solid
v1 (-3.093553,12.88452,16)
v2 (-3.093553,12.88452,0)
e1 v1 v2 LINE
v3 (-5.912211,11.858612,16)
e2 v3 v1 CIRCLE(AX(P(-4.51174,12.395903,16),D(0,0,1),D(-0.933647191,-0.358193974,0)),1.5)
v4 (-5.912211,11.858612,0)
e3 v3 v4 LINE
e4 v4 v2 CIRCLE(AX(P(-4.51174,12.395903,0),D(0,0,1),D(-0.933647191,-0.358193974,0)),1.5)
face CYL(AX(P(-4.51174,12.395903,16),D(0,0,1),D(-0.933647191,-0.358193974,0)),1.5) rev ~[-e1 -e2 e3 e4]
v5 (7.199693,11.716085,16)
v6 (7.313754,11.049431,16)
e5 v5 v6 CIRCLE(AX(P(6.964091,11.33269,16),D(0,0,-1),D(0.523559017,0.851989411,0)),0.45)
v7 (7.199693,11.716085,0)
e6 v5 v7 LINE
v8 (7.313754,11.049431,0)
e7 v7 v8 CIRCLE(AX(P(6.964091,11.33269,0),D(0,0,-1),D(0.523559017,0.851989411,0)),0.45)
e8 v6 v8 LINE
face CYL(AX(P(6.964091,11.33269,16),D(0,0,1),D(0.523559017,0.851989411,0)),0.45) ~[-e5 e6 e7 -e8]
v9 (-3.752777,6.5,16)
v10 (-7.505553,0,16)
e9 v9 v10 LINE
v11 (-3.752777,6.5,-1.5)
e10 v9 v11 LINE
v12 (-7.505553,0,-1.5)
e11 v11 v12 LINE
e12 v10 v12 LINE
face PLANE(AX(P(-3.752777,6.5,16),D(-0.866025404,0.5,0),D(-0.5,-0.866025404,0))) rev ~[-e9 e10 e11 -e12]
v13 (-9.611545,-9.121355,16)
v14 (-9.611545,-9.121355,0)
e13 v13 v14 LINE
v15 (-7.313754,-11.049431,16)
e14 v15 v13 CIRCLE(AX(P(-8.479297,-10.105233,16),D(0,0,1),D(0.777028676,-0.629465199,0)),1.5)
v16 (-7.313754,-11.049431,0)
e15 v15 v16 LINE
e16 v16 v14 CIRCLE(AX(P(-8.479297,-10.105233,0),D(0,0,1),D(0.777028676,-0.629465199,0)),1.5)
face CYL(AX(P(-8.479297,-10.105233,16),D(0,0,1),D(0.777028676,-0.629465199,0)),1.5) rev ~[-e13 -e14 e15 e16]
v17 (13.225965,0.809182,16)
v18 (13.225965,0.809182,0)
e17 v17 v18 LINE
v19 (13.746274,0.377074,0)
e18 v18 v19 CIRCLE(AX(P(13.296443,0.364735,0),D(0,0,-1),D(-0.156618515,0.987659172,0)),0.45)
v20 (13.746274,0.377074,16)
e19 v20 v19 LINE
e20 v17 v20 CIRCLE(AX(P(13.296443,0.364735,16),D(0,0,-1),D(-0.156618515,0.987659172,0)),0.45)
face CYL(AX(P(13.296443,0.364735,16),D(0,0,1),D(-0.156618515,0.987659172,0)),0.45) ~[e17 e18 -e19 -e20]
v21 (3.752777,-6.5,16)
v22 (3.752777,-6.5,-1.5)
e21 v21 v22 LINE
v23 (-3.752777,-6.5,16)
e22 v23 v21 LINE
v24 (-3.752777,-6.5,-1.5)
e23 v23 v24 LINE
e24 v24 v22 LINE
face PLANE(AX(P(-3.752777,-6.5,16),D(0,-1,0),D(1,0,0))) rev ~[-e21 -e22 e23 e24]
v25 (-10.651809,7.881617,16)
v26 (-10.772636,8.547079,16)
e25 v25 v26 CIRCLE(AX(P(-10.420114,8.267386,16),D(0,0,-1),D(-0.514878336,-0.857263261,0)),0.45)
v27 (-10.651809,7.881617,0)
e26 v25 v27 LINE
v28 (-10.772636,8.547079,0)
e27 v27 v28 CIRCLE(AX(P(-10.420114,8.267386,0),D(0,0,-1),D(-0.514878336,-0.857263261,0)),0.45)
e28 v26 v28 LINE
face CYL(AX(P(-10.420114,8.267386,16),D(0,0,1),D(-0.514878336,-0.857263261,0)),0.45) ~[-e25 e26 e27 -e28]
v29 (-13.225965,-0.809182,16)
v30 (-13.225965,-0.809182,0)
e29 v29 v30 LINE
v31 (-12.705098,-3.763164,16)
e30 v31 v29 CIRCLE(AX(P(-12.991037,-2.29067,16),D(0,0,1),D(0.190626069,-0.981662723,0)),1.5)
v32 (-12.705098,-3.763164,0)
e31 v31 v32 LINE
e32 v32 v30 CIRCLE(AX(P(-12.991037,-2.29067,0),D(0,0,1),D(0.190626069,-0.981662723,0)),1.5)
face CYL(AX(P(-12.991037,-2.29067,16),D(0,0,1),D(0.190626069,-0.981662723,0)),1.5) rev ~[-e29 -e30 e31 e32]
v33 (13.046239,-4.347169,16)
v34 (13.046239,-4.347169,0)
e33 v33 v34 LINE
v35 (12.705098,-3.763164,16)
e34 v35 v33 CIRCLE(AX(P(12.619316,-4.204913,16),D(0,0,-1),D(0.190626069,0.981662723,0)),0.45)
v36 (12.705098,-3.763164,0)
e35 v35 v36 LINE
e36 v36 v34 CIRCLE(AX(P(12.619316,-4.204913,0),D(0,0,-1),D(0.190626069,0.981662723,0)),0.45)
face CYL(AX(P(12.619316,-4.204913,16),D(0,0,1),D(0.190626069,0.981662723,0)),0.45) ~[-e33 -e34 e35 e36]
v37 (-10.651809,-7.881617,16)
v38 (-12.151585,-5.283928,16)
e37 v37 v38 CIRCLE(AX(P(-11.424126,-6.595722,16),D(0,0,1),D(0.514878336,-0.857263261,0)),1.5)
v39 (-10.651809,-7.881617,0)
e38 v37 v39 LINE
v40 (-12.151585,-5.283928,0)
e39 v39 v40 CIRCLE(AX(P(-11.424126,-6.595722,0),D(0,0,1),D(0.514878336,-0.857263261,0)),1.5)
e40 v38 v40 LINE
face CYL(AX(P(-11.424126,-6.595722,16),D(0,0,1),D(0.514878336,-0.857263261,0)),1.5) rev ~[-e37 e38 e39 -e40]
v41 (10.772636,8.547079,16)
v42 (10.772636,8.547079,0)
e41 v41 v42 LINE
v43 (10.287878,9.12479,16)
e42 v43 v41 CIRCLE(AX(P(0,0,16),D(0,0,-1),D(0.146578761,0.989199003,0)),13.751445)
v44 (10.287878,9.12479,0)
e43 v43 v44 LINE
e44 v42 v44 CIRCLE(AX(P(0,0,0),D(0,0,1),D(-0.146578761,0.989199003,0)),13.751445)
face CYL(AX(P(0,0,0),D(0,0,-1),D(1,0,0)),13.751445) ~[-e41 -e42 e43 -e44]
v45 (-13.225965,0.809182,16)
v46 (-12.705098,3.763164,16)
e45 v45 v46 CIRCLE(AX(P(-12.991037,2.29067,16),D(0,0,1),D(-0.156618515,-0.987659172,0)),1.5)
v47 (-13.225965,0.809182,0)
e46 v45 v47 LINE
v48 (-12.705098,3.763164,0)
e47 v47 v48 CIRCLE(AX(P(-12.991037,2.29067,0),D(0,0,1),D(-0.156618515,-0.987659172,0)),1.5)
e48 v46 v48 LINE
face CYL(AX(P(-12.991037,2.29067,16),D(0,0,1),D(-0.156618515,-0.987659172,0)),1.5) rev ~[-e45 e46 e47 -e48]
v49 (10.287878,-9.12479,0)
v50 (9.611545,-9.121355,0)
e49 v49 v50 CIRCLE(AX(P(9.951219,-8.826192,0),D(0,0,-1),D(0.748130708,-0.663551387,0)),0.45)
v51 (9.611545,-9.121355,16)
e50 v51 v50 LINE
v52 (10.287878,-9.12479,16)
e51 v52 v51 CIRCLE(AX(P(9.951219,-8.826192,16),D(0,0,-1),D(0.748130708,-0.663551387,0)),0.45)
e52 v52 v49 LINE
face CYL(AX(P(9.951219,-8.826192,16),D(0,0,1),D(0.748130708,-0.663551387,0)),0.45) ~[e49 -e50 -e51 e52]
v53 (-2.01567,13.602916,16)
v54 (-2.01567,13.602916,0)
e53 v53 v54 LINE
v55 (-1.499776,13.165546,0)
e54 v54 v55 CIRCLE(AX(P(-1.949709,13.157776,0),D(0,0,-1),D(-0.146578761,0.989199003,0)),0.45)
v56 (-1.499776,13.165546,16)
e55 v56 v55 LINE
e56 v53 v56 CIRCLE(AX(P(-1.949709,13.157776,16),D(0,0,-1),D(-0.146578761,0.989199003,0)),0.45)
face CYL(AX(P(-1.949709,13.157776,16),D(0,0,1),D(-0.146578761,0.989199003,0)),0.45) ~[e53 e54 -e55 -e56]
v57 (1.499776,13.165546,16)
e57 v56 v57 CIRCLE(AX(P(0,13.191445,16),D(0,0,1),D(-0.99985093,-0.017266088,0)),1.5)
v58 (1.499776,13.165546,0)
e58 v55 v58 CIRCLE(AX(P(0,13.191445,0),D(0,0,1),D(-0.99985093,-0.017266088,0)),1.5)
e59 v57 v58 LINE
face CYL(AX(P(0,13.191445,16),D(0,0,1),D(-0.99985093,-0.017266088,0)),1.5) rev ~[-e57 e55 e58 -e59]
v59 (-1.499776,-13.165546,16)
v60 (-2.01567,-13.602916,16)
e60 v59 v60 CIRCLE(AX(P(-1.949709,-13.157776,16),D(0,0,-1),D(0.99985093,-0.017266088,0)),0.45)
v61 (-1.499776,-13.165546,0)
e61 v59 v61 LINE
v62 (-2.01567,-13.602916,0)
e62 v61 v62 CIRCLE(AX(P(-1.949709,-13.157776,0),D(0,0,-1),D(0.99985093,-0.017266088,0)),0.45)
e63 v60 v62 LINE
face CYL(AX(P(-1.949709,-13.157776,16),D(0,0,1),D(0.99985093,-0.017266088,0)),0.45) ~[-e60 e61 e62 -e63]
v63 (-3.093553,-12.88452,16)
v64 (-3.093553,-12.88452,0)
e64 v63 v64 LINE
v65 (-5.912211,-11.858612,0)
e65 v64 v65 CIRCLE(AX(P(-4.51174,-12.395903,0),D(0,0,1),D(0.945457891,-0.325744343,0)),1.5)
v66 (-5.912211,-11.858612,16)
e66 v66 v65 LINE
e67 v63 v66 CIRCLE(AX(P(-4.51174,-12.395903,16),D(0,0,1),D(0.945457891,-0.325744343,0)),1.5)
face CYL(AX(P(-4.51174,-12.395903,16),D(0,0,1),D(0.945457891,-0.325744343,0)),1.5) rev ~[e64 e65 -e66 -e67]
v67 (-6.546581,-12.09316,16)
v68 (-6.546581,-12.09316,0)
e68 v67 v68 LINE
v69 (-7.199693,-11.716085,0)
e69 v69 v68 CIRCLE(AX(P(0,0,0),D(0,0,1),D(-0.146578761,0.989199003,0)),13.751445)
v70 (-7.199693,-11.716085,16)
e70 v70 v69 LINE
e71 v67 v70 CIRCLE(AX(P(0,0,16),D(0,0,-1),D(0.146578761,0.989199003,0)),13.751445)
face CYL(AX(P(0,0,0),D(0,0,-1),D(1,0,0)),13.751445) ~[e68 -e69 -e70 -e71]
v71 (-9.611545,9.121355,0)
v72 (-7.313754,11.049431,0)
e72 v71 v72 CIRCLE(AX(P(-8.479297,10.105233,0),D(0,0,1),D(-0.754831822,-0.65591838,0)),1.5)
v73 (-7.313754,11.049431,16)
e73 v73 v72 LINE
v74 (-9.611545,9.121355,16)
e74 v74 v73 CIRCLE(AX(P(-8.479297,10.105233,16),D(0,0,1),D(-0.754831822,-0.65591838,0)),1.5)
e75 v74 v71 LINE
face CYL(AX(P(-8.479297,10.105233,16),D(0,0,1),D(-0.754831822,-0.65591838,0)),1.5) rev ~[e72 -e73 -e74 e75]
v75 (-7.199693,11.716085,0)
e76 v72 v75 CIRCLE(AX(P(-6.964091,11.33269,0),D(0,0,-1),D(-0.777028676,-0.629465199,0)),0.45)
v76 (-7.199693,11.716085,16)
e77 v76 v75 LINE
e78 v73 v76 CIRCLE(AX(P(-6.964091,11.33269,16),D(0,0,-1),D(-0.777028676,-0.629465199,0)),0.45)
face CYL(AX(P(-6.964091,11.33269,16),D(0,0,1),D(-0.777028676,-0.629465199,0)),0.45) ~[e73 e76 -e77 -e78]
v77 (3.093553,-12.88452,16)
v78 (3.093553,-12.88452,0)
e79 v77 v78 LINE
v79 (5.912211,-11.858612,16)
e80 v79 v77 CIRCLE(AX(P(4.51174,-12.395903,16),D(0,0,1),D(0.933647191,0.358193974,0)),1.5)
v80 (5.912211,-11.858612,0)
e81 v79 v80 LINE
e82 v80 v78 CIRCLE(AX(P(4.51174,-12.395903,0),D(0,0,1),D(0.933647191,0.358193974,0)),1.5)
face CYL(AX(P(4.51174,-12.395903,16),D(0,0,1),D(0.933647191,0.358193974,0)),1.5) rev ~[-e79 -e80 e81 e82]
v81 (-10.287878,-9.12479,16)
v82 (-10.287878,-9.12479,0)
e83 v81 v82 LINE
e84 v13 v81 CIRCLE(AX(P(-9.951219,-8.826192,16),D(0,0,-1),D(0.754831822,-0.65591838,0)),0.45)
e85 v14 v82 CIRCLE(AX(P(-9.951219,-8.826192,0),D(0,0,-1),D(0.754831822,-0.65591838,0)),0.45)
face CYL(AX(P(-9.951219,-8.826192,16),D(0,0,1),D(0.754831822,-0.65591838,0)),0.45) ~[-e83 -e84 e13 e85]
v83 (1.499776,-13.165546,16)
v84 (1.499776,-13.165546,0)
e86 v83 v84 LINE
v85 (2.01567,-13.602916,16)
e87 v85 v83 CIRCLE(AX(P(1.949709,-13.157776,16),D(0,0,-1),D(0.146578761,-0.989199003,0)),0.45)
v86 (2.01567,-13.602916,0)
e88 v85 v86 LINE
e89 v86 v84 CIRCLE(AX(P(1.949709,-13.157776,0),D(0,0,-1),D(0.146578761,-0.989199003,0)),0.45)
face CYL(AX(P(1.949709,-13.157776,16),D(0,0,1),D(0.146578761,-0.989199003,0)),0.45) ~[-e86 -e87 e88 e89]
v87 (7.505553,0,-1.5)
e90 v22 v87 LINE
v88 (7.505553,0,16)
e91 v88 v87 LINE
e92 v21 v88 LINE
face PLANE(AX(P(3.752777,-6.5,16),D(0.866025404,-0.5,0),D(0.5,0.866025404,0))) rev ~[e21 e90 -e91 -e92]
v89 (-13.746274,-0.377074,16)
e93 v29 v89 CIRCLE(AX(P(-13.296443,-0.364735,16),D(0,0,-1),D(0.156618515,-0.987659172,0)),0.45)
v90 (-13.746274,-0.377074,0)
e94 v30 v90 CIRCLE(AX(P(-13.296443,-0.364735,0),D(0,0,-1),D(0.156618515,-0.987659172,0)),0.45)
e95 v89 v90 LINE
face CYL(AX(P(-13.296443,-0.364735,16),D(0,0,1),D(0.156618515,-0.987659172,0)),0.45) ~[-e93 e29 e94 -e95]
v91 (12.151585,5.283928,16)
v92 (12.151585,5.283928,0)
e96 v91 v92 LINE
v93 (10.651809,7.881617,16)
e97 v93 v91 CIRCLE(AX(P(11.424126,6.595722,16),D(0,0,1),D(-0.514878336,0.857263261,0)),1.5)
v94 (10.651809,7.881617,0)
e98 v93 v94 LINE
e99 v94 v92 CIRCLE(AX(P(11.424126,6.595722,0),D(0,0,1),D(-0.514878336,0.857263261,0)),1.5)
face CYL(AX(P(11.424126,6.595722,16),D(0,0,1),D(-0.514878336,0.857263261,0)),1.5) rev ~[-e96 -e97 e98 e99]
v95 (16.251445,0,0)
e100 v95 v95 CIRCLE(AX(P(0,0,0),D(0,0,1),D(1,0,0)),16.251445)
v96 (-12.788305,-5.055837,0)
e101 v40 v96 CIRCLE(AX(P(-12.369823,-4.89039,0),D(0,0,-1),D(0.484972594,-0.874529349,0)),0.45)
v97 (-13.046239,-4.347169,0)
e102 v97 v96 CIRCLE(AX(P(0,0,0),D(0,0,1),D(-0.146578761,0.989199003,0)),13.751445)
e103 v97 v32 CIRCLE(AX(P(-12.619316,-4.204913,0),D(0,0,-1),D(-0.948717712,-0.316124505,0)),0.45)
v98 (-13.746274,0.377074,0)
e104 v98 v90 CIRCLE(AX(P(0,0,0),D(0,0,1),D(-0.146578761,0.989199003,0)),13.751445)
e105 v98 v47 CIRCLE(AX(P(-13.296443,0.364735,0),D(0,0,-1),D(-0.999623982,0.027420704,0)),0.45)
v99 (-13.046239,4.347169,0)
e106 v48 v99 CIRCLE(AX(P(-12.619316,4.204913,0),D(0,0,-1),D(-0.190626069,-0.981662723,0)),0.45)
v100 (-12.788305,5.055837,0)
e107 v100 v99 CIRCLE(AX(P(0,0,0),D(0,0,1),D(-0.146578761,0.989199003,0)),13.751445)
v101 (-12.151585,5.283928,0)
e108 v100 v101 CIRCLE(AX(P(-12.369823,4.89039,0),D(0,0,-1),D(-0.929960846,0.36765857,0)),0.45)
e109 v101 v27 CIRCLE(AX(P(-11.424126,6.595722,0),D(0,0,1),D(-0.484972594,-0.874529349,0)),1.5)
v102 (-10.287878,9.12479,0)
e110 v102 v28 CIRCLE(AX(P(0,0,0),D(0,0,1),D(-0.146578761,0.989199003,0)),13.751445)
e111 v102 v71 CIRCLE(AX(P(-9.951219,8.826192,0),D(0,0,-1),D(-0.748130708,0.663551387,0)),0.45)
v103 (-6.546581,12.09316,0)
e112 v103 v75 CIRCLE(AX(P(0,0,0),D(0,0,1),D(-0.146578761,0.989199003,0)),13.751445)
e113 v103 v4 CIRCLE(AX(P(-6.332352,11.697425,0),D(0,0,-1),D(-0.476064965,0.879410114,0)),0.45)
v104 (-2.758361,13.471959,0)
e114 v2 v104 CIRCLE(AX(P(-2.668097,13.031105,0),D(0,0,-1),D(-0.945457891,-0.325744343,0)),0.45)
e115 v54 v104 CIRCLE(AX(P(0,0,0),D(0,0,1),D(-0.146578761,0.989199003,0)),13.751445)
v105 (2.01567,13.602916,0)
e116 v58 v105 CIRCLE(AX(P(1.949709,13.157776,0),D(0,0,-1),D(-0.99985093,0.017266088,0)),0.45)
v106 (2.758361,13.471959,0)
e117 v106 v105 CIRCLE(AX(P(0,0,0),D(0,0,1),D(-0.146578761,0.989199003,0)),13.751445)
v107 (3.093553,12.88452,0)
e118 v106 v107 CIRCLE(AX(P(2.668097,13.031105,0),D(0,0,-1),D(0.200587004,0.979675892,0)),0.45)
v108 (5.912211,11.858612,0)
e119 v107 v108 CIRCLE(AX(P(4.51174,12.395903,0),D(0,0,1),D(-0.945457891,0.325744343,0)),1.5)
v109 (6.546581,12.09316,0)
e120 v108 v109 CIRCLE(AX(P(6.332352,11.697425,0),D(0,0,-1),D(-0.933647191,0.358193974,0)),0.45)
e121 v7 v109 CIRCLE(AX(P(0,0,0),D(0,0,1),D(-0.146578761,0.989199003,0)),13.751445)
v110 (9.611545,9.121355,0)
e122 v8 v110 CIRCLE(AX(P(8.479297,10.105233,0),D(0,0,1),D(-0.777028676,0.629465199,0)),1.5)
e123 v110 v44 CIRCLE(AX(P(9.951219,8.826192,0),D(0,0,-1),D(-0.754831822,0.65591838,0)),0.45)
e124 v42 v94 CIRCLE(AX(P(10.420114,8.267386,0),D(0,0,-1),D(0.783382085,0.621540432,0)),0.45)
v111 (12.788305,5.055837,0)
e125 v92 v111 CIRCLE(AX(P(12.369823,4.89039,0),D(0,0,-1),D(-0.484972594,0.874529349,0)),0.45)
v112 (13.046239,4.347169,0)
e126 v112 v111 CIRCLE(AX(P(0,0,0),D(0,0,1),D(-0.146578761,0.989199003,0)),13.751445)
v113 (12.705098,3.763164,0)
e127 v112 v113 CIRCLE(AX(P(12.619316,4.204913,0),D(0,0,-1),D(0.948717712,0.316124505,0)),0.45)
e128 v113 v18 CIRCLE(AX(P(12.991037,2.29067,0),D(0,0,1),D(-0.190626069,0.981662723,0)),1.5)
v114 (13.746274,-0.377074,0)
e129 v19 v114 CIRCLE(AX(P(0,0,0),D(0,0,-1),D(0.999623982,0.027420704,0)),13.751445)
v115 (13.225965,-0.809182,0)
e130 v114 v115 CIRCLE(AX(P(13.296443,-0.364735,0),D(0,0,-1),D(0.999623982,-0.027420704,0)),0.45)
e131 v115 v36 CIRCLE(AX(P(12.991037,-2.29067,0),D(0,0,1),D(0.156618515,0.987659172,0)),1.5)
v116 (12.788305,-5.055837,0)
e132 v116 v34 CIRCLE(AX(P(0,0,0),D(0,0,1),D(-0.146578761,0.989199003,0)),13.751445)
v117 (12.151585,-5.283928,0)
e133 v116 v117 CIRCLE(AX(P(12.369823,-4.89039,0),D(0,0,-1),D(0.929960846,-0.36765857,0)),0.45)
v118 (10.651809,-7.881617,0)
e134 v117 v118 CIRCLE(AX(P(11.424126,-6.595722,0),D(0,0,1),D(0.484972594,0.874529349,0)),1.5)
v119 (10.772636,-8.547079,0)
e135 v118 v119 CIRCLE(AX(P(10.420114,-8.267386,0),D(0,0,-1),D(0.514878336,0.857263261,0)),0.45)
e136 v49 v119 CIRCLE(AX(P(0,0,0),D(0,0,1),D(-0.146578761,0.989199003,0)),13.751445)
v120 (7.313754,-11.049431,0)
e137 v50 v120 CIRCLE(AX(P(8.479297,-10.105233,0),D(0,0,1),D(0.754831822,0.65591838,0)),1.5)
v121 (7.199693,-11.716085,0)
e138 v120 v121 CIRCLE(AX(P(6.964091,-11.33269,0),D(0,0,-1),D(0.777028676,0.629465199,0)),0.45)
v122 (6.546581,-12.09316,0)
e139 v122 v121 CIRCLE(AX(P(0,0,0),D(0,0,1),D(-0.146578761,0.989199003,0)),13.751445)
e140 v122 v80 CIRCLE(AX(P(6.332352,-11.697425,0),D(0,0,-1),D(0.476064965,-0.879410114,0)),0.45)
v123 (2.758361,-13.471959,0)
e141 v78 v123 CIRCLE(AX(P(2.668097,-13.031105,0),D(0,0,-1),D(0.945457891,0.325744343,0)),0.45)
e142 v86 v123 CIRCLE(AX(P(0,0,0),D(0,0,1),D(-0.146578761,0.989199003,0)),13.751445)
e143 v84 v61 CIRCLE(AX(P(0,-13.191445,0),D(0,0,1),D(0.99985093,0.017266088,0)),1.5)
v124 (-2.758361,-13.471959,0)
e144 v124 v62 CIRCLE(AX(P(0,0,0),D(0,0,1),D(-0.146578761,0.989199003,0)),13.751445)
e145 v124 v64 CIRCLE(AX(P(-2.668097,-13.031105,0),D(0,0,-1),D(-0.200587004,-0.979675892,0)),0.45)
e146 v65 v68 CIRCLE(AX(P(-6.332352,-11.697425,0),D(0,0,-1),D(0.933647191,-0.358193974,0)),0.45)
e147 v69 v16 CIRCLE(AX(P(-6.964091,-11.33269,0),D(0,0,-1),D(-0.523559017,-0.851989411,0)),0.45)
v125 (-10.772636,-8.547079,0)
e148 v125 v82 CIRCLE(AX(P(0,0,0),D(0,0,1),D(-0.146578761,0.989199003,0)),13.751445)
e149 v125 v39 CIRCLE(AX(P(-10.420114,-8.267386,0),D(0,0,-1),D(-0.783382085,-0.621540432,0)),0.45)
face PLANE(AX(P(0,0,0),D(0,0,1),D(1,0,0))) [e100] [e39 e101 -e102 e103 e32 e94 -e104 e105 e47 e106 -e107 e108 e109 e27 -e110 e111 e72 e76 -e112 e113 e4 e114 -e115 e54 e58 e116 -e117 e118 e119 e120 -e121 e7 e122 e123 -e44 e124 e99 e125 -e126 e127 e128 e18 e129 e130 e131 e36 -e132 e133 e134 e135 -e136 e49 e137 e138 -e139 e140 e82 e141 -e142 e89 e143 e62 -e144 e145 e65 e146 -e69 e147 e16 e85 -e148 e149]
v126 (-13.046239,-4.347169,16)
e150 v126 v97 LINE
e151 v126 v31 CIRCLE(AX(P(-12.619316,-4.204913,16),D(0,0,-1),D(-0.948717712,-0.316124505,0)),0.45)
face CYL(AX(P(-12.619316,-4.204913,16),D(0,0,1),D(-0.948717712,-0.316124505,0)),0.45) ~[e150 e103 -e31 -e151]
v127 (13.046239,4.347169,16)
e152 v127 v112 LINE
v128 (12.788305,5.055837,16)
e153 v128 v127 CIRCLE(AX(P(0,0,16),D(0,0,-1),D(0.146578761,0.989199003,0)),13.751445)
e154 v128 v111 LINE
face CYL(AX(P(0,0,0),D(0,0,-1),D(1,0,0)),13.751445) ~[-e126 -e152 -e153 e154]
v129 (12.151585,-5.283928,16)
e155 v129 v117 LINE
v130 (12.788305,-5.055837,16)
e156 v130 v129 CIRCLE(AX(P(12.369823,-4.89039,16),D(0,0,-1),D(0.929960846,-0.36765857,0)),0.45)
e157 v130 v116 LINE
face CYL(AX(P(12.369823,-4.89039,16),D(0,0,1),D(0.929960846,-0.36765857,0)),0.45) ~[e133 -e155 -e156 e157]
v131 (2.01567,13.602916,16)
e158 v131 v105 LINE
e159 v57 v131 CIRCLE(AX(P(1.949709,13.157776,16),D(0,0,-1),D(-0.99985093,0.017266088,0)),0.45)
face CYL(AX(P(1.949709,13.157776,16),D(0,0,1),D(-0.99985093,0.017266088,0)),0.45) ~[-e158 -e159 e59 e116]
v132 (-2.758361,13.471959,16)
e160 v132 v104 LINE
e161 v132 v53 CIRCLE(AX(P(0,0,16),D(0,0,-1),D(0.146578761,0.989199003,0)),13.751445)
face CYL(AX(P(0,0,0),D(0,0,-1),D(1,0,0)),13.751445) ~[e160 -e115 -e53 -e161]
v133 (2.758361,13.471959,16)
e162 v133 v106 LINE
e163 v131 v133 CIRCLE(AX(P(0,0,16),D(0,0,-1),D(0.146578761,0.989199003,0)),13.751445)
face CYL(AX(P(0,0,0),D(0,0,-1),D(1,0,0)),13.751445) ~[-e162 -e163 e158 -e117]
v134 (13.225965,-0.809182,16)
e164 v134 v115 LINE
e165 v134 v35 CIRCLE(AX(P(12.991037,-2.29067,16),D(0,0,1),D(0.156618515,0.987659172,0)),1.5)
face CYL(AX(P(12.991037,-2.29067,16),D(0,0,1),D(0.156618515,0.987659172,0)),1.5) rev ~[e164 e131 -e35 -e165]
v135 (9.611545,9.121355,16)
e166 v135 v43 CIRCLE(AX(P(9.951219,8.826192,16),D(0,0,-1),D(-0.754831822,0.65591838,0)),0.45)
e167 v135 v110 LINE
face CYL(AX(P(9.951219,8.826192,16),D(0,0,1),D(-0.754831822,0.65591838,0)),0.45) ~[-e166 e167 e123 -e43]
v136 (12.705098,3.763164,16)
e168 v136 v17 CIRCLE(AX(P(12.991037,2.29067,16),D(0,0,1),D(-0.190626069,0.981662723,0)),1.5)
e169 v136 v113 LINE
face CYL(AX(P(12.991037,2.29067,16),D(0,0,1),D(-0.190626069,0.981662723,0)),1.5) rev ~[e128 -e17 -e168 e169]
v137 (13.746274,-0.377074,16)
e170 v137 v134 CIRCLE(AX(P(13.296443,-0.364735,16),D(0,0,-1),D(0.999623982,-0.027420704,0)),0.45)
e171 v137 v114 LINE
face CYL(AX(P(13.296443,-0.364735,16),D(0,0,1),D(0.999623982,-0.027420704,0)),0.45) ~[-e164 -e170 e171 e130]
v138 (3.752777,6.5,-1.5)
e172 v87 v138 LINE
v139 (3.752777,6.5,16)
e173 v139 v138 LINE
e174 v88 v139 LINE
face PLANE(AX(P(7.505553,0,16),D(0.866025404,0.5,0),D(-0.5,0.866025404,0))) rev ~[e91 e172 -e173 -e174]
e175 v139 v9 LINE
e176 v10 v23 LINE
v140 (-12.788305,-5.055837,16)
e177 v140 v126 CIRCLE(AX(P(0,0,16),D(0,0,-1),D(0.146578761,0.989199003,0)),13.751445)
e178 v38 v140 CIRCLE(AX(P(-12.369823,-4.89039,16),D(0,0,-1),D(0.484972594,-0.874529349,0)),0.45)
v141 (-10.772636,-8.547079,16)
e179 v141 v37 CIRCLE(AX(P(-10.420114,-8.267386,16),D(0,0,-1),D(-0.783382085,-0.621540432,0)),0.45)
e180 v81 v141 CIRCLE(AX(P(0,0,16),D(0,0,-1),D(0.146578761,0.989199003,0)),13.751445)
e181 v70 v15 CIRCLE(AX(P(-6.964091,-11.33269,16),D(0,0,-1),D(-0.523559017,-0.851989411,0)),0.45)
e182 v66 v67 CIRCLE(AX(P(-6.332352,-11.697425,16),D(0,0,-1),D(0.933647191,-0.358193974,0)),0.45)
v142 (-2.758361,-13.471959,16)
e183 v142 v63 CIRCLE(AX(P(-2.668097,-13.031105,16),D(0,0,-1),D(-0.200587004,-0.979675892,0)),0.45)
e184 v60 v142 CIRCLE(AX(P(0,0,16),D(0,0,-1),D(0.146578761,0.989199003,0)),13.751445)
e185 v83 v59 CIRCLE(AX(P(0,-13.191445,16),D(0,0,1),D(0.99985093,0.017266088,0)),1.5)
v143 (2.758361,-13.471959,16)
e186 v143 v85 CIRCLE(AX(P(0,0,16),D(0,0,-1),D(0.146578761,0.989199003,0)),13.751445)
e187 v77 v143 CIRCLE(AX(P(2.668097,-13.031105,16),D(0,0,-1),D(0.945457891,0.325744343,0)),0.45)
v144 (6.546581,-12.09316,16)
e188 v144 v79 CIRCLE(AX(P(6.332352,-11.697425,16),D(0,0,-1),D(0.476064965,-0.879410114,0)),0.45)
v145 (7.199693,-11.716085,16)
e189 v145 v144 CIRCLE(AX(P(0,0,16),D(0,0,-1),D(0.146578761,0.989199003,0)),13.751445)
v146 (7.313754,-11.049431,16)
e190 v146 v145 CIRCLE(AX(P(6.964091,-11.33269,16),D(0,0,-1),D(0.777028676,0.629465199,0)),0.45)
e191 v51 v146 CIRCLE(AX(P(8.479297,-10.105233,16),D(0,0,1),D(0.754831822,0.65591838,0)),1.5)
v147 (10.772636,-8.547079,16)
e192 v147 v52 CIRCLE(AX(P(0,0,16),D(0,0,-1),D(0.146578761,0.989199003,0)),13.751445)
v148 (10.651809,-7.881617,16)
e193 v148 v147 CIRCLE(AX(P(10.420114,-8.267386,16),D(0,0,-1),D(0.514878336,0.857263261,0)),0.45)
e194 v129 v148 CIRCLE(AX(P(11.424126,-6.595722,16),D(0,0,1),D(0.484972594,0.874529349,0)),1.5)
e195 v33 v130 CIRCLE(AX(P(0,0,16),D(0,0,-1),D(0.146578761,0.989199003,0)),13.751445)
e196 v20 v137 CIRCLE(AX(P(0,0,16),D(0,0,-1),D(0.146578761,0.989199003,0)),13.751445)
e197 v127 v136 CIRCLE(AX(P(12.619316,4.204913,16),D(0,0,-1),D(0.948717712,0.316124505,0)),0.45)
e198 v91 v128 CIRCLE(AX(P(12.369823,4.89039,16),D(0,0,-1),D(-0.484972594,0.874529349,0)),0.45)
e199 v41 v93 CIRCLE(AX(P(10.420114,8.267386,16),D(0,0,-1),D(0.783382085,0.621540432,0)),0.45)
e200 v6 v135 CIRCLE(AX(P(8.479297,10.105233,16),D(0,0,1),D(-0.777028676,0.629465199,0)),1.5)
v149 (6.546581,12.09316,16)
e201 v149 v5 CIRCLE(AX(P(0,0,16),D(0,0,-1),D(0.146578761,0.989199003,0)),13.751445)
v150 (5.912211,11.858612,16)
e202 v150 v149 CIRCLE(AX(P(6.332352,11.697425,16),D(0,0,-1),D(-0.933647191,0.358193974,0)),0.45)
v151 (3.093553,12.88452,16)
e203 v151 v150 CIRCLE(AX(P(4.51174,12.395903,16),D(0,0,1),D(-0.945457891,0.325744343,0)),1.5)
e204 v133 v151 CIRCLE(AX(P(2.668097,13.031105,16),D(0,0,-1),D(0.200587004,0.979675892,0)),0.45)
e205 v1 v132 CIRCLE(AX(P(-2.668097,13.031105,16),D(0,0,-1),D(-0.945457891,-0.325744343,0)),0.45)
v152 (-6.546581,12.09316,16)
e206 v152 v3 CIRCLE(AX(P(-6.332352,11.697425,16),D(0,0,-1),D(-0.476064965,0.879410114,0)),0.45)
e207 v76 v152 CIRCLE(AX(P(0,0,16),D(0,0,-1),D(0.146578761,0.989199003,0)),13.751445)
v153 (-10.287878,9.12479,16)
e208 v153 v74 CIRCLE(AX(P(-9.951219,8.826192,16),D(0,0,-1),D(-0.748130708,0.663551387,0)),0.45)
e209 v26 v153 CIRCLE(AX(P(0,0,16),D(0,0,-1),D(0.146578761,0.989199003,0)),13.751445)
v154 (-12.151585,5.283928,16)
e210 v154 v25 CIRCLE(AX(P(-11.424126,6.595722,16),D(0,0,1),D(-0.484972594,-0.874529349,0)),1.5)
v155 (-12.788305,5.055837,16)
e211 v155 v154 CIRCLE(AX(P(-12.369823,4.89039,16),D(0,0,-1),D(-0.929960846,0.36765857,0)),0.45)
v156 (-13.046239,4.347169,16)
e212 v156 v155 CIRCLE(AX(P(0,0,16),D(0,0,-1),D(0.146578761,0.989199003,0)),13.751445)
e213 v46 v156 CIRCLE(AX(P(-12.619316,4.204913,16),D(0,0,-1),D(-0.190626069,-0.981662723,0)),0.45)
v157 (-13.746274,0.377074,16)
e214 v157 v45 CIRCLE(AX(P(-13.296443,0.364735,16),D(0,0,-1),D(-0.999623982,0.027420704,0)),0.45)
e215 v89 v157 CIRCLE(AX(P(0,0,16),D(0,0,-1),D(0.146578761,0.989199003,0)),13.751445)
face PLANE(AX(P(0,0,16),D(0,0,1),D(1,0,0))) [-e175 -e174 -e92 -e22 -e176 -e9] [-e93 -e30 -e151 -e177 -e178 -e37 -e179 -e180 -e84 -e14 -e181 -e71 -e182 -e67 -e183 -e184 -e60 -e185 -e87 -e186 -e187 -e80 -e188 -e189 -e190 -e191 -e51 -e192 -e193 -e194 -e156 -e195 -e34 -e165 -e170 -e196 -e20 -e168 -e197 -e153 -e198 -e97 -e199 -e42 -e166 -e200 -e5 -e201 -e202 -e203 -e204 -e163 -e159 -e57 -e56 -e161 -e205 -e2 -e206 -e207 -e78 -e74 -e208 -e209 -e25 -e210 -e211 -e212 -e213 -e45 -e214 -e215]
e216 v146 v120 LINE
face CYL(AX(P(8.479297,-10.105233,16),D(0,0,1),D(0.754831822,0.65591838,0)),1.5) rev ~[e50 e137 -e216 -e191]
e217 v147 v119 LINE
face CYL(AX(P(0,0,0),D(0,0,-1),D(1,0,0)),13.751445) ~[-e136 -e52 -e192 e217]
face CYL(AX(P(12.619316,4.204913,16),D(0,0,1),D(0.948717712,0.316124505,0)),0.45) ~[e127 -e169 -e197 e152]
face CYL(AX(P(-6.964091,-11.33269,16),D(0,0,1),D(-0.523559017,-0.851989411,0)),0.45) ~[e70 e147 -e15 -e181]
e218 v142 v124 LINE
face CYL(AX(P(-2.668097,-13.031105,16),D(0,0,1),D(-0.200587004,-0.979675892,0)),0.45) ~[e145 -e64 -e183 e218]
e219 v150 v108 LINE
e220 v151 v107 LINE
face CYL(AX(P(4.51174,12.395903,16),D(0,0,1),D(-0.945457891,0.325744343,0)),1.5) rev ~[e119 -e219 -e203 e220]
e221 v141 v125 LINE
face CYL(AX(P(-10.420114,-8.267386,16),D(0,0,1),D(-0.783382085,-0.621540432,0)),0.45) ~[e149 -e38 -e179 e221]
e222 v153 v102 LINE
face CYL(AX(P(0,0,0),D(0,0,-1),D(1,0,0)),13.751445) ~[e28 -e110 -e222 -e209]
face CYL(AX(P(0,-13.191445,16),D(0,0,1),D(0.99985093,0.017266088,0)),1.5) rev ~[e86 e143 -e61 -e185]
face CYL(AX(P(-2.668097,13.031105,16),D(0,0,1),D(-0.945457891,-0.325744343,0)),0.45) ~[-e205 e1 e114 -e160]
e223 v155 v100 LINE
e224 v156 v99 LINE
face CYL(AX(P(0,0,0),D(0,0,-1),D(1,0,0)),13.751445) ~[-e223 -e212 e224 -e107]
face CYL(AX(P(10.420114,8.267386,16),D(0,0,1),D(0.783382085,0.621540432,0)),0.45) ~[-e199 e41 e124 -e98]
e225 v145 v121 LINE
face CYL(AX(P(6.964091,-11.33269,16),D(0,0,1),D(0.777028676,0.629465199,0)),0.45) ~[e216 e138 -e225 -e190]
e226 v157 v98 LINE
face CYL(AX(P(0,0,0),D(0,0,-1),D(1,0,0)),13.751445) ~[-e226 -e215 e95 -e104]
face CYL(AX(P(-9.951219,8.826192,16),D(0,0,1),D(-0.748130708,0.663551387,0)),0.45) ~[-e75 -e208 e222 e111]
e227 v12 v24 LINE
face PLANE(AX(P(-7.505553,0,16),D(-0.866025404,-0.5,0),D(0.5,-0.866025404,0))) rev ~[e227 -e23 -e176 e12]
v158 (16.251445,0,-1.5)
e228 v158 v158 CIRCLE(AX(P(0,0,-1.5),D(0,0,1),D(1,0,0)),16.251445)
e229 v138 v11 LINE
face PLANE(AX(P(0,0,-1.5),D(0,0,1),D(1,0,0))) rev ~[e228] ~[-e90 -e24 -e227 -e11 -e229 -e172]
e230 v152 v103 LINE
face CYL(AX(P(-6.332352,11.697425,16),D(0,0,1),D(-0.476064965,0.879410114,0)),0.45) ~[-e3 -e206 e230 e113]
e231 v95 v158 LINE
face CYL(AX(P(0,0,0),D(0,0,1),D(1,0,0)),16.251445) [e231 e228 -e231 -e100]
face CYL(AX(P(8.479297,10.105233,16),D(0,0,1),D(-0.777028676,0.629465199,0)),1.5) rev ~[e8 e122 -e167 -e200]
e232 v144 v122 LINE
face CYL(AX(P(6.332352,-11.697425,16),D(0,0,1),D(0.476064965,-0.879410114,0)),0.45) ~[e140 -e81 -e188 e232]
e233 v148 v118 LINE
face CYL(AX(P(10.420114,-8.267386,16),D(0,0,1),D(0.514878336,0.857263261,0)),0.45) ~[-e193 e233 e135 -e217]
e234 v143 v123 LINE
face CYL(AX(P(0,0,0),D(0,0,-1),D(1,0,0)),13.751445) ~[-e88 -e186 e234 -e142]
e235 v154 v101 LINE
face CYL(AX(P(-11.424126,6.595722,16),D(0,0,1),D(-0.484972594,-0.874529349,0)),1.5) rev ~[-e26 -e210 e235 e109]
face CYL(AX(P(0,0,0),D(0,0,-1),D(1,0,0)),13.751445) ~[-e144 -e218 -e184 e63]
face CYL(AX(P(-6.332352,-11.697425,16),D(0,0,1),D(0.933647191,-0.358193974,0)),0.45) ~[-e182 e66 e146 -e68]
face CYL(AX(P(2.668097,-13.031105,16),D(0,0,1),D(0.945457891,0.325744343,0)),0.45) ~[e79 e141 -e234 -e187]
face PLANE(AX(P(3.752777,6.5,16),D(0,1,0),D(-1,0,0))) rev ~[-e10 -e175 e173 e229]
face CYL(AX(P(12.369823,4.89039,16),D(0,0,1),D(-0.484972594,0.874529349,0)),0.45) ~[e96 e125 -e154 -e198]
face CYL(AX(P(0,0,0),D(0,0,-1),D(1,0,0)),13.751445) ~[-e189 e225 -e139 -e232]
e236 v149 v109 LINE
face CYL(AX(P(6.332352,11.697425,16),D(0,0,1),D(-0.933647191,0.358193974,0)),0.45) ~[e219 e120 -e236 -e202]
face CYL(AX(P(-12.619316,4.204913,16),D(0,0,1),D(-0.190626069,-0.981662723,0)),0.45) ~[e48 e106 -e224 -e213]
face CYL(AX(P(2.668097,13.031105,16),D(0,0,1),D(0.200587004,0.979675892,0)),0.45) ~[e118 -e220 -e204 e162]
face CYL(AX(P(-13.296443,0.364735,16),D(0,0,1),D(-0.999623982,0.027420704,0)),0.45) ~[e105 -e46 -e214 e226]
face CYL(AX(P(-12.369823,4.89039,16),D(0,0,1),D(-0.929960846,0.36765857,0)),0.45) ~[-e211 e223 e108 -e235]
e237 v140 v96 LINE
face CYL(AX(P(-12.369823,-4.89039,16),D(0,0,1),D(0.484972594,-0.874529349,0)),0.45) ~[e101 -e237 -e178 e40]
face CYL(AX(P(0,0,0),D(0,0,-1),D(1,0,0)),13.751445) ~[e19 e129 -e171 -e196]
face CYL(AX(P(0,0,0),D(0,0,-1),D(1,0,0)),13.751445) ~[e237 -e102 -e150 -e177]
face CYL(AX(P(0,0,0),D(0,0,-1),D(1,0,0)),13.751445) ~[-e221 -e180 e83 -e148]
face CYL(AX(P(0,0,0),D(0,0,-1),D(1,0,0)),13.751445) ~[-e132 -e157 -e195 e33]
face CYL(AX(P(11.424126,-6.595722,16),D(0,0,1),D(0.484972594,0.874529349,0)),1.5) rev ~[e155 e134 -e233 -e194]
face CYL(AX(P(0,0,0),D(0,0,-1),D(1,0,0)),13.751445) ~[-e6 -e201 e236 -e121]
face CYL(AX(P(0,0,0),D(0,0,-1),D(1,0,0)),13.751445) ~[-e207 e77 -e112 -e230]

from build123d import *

# Parameters (mm, degrees)
F2_R            = 13.7514448946
F3_DEPTH        = 16
F5_DEPTH        = 16
F5_COPIES_COUNT = 18
F8_R            = 16.2514448946
F8_R_2          = 13.7514448946
F9_DEPTH        = 1.5
F10_DEPTH       = 17.501


# Not quite as in the source:
# - a feature of the source that left no trace in its solid (it failed there, or was rolled back) is left out
# - a pattern or mirror of a feature is missing from the dataset's text; its kind, count and spacing are read off the source's solid


with BuildPart() as f3:
    # F2 (on Top) → F3 (new body)
    with BuildSketch(Plane.XY):
        Circle(F2_R)
    extrude(amount=F3_DEPTH)

    # F4 (on face) → F5 (cut, through all)
    with BuildSketch(Plane.XY.offset(16)):
        with BuildLine():
            ThreePointArc((-2.015669756, 13.6029155744), (-1.6587079327, 13.5010225766), (-1.499776395, 13.1655457628))
            ThreePointArc((-1.499776395, 13.1655457628), (0, 11.6914448946), (1.499776395, 13.1655457628))
            ThreePointArc((1.499776395, 13.1655457628), (1.6587079327, 13.5010225766), (2.015669756, 13.6029155744))
            ThreePointArc((2.015669756, 13.6029155744), (0, 13.7514448946), (-2.015669756, 13.6029155744))
        make_face()
    f5 = extrude(amount=-F5_DEPTH, mode=Mode.SUBTRACT)

    # F5_copies: F5 ×18 about axis
    f5_copies_axis = Axis((0, 0, 0), (0, 0, 1))
    for i in range(1, F5_COPIES_COUNT):
        add(f5.rotate(f5_copies_axis, i * 360 / F5_COPIES_COUNT), mode=Mode.SUBTRACT)

    # F8 (on face) + F2 (on Top) → F9 (join)
    with BuildSketch(Plane.XY):
        Circle(F8_R)
        Circle(F8_R_2, mode=Mode.SUBTRACT)
    with BuildSketch(Plane.XY):
        Circle(F2_R)
    extrude(amount=-F9_DEPTH)

    # F7 (on face) → F10 (cut, through all)
    with BuildSketch(Plane.XY.offset(16)):
        Polygon((3.7527767497, 6.5), (-3.7527767497, 6.5), (-7.5055534995, 0), (-3.7527767497, -6.5), (3.7527767497, -6.5), (7.5055534995, 0), align=None)
    extrude(amount=-F10_DEPTH, mode=Mode.SUBTRACT)


solid = f3.part
